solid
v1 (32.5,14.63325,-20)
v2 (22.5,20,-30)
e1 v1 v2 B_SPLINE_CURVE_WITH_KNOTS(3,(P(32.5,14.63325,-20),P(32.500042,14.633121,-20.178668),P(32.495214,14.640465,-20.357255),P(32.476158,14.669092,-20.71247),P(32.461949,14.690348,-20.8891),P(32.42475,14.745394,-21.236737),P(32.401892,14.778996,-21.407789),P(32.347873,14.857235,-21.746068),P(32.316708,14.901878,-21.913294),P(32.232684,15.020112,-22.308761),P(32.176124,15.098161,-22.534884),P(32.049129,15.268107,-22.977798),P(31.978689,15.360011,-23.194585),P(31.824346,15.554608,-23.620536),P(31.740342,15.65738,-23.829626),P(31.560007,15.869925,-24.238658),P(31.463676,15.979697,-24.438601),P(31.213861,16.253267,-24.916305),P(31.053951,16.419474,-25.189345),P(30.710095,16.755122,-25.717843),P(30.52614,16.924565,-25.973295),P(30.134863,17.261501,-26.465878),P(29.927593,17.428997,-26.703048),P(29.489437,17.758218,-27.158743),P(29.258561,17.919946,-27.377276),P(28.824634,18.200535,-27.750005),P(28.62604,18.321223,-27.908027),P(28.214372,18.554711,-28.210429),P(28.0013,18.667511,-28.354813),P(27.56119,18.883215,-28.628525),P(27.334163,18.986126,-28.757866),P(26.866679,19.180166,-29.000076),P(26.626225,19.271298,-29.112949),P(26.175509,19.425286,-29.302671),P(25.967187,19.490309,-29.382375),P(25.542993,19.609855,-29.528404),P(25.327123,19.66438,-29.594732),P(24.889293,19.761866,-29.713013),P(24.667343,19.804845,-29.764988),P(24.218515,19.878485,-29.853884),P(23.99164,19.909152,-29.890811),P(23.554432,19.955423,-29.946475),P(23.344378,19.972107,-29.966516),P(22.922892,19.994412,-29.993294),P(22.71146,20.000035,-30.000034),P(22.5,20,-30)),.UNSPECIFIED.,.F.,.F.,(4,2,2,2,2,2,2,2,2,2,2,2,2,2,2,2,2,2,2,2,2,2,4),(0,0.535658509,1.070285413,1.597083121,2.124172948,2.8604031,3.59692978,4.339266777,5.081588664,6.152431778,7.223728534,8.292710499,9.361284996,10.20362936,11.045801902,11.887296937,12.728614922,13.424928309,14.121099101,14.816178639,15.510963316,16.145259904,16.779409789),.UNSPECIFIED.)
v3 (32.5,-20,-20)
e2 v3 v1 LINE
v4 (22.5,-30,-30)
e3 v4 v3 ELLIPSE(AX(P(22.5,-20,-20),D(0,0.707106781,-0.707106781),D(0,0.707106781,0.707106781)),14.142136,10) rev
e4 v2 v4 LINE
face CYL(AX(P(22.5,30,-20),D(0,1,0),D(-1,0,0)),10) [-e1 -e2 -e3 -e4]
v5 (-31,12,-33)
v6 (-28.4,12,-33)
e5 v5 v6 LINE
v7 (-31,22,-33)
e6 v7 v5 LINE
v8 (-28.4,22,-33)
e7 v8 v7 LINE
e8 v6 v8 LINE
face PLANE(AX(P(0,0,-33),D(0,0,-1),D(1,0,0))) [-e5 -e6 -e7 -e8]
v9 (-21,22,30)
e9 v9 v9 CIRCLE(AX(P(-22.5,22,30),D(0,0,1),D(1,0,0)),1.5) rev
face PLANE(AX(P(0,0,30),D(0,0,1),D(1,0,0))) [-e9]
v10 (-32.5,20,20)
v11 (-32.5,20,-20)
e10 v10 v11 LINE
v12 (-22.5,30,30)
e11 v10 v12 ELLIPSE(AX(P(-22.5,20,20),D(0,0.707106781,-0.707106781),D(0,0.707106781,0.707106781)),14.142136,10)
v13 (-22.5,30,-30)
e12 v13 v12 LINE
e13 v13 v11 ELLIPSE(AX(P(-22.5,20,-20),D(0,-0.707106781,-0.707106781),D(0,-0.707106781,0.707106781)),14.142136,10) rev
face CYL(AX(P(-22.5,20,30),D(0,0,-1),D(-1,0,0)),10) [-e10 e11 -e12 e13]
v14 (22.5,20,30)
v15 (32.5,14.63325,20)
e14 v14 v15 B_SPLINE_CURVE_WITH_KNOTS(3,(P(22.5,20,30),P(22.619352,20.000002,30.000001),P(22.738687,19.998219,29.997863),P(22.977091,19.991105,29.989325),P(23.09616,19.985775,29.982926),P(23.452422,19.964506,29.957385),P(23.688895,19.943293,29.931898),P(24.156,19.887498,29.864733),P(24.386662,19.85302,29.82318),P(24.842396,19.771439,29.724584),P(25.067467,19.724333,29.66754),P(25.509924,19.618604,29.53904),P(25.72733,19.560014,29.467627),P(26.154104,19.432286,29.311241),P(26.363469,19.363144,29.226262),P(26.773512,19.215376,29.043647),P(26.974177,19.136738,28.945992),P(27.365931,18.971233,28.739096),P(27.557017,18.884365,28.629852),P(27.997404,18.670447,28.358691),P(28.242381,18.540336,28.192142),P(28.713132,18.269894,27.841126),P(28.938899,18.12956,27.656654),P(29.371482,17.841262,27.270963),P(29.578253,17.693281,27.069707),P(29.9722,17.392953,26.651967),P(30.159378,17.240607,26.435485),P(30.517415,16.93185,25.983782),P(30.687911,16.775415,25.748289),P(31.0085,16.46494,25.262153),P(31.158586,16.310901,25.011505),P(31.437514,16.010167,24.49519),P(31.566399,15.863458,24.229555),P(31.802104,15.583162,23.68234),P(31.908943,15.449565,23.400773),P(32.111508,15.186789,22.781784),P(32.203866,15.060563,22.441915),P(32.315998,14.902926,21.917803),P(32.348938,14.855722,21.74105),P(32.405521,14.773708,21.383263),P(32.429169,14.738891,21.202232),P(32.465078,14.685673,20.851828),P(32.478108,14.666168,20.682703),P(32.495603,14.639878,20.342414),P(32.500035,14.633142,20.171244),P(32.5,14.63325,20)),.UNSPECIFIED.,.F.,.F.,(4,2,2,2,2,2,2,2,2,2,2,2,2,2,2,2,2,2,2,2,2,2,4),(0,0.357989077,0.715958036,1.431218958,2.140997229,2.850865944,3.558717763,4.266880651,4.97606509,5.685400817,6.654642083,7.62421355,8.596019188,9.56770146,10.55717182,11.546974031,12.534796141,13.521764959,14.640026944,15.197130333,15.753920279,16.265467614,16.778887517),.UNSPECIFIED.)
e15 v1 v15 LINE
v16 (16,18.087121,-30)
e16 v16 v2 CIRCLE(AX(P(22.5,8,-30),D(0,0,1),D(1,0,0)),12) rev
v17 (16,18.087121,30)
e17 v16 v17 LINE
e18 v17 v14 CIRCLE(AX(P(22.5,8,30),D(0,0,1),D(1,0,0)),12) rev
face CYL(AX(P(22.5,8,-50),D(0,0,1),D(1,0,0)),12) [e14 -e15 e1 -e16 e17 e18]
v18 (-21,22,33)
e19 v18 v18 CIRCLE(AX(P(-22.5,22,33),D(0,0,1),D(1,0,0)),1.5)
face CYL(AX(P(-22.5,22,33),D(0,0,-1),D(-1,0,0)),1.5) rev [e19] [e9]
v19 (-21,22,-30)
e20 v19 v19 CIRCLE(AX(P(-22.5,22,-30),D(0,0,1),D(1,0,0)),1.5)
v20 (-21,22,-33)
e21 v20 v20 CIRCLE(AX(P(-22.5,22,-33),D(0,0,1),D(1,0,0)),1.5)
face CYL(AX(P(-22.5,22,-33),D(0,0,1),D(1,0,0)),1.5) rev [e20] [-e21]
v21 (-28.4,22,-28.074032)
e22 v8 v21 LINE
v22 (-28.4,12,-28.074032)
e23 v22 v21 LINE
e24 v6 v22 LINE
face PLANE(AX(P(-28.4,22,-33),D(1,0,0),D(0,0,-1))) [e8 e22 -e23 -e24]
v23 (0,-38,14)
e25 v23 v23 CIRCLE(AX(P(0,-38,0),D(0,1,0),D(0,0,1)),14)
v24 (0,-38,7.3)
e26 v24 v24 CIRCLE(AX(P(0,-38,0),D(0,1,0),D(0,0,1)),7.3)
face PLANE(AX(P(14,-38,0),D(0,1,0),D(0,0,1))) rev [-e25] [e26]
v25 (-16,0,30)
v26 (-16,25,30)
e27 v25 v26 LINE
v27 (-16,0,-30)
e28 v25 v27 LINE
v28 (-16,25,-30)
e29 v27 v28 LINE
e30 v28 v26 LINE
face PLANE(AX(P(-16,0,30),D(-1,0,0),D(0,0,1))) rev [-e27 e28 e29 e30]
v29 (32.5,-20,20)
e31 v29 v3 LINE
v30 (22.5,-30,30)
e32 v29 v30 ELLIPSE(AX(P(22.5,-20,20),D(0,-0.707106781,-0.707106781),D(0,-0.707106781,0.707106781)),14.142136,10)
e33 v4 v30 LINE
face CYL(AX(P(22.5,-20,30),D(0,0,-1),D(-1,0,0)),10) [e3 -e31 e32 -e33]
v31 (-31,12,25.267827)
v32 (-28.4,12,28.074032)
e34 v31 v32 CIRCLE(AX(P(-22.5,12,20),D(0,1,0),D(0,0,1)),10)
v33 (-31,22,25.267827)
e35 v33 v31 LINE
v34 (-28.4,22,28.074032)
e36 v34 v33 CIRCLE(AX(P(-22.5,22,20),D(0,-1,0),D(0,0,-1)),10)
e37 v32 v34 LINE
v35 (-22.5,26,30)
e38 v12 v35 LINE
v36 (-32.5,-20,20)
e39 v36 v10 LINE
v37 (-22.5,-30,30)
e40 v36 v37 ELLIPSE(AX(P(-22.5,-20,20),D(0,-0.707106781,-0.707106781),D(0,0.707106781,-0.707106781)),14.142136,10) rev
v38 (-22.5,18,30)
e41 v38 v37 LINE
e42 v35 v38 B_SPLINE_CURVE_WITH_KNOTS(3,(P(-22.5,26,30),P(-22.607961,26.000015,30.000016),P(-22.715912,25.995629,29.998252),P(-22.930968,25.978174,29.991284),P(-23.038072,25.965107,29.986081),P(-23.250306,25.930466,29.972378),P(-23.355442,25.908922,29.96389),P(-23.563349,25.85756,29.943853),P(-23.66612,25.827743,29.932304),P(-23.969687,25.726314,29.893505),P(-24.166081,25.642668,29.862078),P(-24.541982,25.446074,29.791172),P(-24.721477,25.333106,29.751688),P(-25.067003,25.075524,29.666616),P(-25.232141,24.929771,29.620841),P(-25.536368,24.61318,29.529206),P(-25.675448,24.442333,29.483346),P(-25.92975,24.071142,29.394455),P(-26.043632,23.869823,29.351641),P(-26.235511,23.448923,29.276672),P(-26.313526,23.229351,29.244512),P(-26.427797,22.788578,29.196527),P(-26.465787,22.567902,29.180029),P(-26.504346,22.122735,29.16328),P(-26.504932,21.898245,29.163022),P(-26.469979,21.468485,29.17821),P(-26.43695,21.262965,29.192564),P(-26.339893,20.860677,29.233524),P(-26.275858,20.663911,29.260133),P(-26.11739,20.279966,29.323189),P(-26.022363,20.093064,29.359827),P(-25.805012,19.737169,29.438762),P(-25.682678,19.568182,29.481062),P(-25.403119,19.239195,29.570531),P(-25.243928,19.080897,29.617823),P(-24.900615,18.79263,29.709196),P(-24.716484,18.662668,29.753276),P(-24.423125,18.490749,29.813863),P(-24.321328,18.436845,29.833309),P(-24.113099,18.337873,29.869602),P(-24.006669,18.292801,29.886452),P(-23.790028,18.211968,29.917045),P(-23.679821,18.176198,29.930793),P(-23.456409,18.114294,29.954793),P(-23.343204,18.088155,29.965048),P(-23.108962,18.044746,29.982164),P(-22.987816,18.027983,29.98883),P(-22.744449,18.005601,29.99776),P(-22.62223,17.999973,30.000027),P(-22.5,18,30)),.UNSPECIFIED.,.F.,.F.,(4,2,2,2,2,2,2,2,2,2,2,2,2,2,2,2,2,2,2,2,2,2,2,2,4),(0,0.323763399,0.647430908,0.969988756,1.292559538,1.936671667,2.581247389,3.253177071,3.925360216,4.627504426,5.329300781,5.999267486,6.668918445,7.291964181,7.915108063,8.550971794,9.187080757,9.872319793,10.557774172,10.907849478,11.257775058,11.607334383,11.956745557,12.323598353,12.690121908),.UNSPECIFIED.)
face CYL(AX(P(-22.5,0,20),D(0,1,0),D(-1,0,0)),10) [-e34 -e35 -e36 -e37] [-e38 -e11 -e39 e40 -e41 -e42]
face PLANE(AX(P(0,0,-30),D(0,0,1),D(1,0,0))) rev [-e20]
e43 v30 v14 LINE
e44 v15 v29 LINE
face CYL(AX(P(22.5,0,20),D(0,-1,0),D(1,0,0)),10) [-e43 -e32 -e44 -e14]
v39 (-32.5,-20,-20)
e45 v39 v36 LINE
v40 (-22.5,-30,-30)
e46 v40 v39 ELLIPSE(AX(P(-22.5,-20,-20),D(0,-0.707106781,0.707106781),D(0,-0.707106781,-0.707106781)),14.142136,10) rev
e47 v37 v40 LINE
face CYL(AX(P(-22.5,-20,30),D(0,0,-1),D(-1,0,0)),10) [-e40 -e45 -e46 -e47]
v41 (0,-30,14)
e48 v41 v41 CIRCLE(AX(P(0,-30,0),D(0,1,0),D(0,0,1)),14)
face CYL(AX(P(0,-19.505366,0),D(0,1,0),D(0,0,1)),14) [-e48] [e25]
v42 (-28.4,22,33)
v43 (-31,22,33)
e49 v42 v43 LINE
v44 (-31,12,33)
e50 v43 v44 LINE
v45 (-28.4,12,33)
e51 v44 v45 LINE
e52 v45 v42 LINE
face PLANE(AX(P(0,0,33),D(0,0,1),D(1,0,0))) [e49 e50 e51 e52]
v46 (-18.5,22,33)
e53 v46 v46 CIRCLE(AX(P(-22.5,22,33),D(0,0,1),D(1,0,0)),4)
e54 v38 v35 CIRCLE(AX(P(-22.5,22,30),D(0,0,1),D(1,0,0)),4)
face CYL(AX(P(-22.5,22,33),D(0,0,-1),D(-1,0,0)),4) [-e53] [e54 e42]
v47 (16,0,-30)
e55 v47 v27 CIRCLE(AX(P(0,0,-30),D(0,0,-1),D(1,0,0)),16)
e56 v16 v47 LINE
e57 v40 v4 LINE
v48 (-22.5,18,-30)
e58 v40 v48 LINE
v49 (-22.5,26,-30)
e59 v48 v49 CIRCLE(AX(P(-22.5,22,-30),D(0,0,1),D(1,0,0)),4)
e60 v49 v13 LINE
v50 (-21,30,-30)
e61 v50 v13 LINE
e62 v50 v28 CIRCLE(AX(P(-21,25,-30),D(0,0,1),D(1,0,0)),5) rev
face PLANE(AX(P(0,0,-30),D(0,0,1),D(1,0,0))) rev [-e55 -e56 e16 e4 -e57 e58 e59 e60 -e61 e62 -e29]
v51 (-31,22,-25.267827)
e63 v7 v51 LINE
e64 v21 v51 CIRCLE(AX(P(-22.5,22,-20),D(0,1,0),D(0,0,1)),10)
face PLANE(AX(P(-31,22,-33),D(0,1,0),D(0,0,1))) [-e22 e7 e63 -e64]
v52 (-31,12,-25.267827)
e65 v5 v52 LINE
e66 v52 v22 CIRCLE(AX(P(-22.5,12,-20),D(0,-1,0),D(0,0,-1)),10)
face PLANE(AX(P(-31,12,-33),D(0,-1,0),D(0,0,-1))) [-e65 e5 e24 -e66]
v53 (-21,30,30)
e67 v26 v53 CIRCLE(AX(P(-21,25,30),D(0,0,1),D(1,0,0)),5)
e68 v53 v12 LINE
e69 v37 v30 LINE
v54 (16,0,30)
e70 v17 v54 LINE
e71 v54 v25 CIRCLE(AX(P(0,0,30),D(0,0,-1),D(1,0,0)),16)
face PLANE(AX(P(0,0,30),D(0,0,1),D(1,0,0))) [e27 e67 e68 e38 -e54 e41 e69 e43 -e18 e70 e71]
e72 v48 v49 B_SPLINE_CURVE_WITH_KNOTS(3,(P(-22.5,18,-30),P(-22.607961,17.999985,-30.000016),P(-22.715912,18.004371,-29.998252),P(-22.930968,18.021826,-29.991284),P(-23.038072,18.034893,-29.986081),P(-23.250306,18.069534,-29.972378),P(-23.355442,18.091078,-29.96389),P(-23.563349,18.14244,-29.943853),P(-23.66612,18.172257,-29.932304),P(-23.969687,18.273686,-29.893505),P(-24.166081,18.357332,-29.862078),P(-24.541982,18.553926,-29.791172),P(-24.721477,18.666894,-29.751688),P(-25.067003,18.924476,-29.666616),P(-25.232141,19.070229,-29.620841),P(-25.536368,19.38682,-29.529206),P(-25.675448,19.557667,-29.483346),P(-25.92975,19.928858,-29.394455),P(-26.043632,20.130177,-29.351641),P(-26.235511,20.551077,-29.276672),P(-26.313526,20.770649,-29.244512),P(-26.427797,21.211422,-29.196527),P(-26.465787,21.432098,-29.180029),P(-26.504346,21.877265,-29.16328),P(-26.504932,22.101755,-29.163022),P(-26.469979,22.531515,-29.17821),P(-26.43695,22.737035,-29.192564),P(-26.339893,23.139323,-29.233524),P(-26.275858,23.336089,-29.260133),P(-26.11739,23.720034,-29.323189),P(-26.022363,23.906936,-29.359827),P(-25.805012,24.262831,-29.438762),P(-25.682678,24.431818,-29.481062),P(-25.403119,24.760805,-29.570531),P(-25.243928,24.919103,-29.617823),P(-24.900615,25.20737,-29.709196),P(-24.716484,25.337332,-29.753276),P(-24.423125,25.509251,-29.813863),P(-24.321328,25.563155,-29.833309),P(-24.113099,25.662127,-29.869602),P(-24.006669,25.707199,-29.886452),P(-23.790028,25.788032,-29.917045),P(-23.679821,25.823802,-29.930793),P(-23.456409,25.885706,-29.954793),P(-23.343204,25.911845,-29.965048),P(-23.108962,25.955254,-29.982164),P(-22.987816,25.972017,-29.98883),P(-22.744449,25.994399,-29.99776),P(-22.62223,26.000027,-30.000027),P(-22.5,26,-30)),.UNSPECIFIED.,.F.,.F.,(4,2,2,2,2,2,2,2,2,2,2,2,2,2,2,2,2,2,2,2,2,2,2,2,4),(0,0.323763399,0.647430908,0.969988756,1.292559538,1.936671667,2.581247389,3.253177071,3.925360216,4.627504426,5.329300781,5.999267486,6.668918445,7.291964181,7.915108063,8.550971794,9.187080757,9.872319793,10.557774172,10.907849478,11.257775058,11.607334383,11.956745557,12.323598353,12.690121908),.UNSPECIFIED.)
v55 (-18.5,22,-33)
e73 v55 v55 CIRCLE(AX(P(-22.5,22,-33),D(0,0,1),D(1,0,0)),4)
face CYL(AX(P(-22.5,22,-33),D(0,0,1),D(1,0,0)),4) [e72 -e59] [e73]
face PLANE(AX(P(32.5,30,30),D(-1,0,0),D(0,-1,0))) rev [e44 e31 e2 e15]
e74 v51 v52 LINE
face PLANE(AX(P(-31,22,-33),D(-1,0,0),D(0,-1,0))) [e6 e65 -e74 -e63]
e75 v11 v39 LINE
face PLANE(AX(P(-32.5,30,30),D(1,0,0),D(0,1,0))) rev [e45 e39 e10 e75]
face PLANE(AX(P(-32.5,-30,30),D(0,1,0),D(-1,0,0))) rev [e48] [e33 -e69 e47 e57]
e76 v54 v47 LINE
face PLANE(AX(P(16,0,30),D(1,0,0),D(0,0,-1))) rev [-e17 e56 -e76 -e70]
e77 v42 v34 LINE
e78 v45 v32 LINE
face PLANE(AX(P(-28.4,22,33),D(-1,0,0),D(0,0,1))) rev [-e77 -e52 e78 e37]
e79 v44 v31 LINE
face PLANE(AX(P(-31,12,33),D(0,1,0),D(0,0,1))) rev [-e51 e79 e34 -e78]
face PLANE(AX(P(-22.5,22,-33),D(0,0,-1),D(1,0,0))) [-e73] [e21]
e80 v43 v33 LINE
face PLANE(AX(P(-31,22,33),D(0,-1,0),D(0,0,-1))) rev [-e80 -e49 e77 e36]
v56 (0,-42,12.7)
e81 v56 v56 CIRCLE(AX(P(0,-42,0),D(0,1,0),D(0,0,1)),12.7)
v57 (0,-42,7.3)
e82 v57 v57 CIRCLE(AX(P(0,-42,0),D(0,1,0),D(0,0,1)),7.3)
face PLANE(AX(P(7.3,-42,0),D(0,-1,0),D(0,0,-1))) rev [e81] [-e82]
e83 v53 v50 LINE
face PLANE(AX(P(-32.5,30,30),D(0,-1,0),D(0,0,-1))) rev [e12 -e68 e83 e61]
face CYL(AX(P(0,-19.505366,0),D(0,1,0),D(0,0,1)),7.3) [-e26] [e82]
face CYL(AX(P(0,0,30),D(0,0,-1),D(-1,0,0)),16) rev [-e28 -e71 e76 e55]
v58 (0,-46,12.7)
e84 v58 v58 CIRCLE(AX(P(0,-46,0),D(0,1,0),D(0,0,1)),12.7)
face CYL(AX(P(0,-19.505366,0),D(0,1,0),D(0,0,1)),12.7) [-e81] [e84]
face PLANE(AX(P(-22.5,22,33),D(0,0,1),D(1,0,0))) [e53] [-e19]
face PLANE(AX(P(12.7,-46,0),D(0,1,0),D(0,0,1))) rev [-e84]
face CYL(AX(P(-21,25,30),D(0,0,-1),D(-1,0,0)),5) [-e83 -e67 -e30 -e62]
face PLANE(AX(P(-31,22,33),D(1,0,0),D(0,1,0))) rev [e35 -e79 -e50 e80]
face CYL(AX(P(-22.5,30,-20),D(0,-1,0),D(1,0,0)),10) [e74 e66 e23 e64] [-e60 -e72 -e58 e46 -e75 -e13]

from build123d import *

# Parameters (mm, degrees)
SALIENTE_EXTRUIR1_DEPTH = 30
CROQUIS2_R              = 4
CROQUIS2_R_2            = 1.5
CROQUIS2_W              = 2.6
CROQUIS2_H              = 10
SALIENTE_EXTRUIR2_DEPTH = 3
REDONDEO1_R             = 10
REDONDEO2_R             = 5
CORTAR_EXTRUIR1_DEPTH   = 50


with BuildPart() as part:
    # Croquis1 → Saliente-Extruir1 (new, symmetric)
    with BuildSketch(Plane.XY):
        with BuildLine():
            Line((-32.5, 30), (-16, 30))
            Line((-16, 30), (-16, 0))
            ThreePointArc((-16, 0), (0, -16), (16, 0))
            Line((16, 0), (16, 30))
            Line((16, 30), (32.5, 30))
            Line((32.5, 30), (32.5, -30))
            Line((32.5, -30), (-32.5, -30))
            Line((-32.5, -30), (-32.5, 30))
        make_face()
    extrude(amount=SALIENTE_EXTRUIR1_DEPTH, both=True)

    # Croquis2 → Saliente-Extruir2 (add)
    # profile 1 of 2: a face of its own
    with BuildSketch(Plane.XY.offset(30)):
        with Locations((-22.5, 22)):
            Circle(CROQUIS2_R)
        with Locations((-22.5, 22)):
            Circle(CROQUIS2_R_2, mode=Mode.SUBTRACT)
    # profile 2 of 2: a face of its own
    with BuildSketch(Plane.XY.offset(30)):
        with Locations((-29.7, 17)):
            Rectangle(CROQUIS2_W, CROQUIS2_H)
    saliente_extruir2 = extrude(amount=SALIENTE_EXTRUIR2_DEPTH)

    # Croquis4 → Revolución1 (revolve)
    with BuildSketch(Plane.XY, mode=Mode.PRIVATE) as revoluci_n1_sk:
        Polygon((0, -30), (14, -30), (14, -38), (7.3, -38), (7.3, -42), (12.7, -42), (12.7, -46), (0, -46), align=None)
    revolve(revoluci_n1_sk.sketch.rotate(Axis((0, -19.505365955, 0), (0, -1, 0)), 90), axis=Axis((0, -19.505365955, 0), (0, -1, 0)))

    # Simetría2: Saliente-Extruir2 across plane
    add(saliente_extruir2.mirror(Plane.XY))

    # Redondeo1
    # the kernel refuses this fillet: 10 mm, written as the material it takes off along each edge
    with BuildSketch(Plane(origin=(32.5, 55, -30), x_dir=(-1, 0, 0), z_dir=(0, -1, 0)), Plane(origin=(-32.5, 30, -55), x_dir=(1, 0, 0), z_dir=(0, 0, 1)), Plane(origin=(32.5, -30, -55), x_dir=(-1, 0, 0), z_dir=(0, 0, 1)), Plane(origin=(-32.5, -30, -55), x_dir=(0, 1, 0), z_dir=(0, 0, 1))) as redondeo1_piece_1:
        with BuildLine():
            CenterArc((REDONDEO1_R, -REDONDEO1_R), REDONDEO1_R, 90, 90)
            Line((0, -REDONDEO1_R), (0, 0))
            Line((0, 0), (REDONDEO1_R, 0))
        make_face()
    extrude(amount=110, mode=Mode.SUBTRACT)
    with BuildSketch(Plane(origin=(-32.5, -55, -30), x_dir=(0, 0, 1), z_dir=(0, 1, 0))) as redondeo1_piece_2_section:
        with BuildLine():
            CenterArc((REDONDEO1_R, REDONDEO1_R), REDONDEO1_R, 180, 90)
            Line((0, REDONDEO1_R), (0, 0))
            Line((0, 0), (REDONDEO1_R, 0))
        make_face()
    redondeo1_piece_2 = extrude(amount=110, mode=Mode.PRIVATE)
    redondeo1_piece_2 = split(redondeo1_piece_2, bisect_by=Plane(origin=(-31, -9, -26.666087893), z_dir=(-1, 0, 0)), keep=Keep.TOP, mode=Mode.PRIVATE)
    add(redondeo1_piece_2, mode=Mode.SUBTRACT)
    with BuildSketch(Plane(origin=(-32.5, -55, -30), x_dir=(0, 0, 1), z_dir=(0, 1, 0))) as redondeo1_piece_3_section:
        with BuildLine():
            CenterArc((REDONDEO1_R, REDONDEO1_R), REDONDEO1_R, 180, 90)
            Line((0, REDONDEO1_R), (0, 0))
            Line((0, 0), (REDONDEO1_R, 0))
        make_face()
    redondeo1_piece_3 = extrude(amount=110, mode=Mode.PRIVATE)
    redondeo1_piece_3 = split(redondeo1_piece_3, bisect_by=Plane(origin=(-29.890039843, 12, -28.324282077), z_dir=(0, -1, 0)), keep=Keep.TOP, mode=Mode.PRIVATE)
    add(redondeo1_piece_3, mode=Mode.SUBTRACT)
    with BuildSketch(Plane(origin=(-32.5, -55, -30), x_dir=(0, 0, 1), z_dir=(0, 1, 0))) as redondeo1_piece_4_section:
        with BuildLine():
            CenterArc((REDONDEO1_R, REDONDEO1_R), REDONDEO1_R, 180, 90)
            Line((0, REDONDEO1_R), (0, 0))
            Line((0, 0), (REDONDEO1_R, 0))
        make_face()
    redondeo1_piece_4 = extrude(amount=110, mode=Mode.PRIVATE)
    redondeo1_piece_4 = split(redondeo1_piece_4, bisect_by=Plane(origin=(-28.4, 16.722523597, -29.405754559), z_dir=(1, 0, 0)), keep=Keep.TOP, mode=Mode.PRIVATE)
    redondeo1_piece_4 = redondeo1_piece_4 - Plane(origin=(-22.5, 22, -29.405754559), x_dir=(1, 0, 0), z_dir=(0, 0, 1)) * Cylinder(4, 260, mode=Mode.PRIVATE)
    add(redondeo1_piece_4, mode=Mode.SUBTRACT)
    with BuildSketch(Plane(origin=(-32.5, -55, -30), x_dir=(0, 0, 1), z_dir=(0, 1, 0))) as redondeo1_piece_5_section:
        with BuildLine():
            CenterArc((REDONDEO1_R, REDONDEO1_R), REDONDEO1_R, 180, 90)
            Line((0, REDONDEO1_R), (0, 0))
            Line((0, 0), (REDONDEO1_R, 0))
        make_face()
    redondeo1_piece_5 = extrude(amount=110, mode=Mode.PRIVATE)
    redondeo1_piece_5 = split(redondeo1_piece_5, bisect_by=Plane(origin=(-29.890039843, 22, -28.324282077), z_dir=(0, 1, 0)), keep=Keep.TOP, mode=Mode.PRIVATE)
    redondeo1_piece_5 = split(redondeo1_piece_5, bisect_by=Plane(origin=(-28.4, 26, -28.324282077), z_dir=(-1, 0, 0)), keep=Keep.TOP, mode=Mode.PRIVATE)
    add(redondeo1_piece_5, mode=Mode.SUBTRACT)
    with BuildSketch(Plane(origin=(32.5, 55, 30), x_dir=(-1, 0, 0), z_dir=(0, -1, 0)), Plane(origin=(32.5, 30, 55), x_dir=(0, -1, 0), z_dir=(0, 0, -1))) as redondeo1_piece_6:
        with BuildLine():
            CenterArc((REDONDEO1_R, REDONDEO1_R), REDONDEO1_R, 180, 90)
            Line((0, REDONDEO1_R), (0, 0))
            Line((0, 0), (REDONDEO1_R, 0))
        make_face()
    extrude(amount=110, mode=Mode.SUBTRACT)
    with BuildSketch(Plane(origin=(-32.5, -55, 30), x_dir=(0, 0, -1), z_dir=(0, 1, 0))) as redondeo1_piece_7_section:
        with BuildLine():
            CenterArc((REDONDEO1_R, -REDONDEO1_R), REDONDEO1_R, 90, 90)
            Line((0, -REDONDEO1_R), (0, 0))
            Line((0, 0), (REDONDEO1_R, 0))
        make_face()
    redondeo1_piece_7 = extrude(amount=110, mode=Mode.PRIVATE)
    redondeo1_piece_7 = split(redondeo1_piece_7, bisect_by=Plane(origin=(-31, -9, 26.666087893), z_dir=(-1, 0, 0)), keep=Keep.TOP, mode=Mode.PRIVATE)
    add(redondeo1_piece_7, mode=Mode.SUBTRACT)
    with BuildSketch(Plane(origin=(-32.5, -55, 30), x_dir=(0, 0, -1), z_dir=(0, 1, 0))) as redondeo1_piece_8_section:
        with BuildLine():
            CenterArc((REDONDEO1_R, -REDONDEO1_R), REDONDEO1_R, 90, 90)
            Line((0, -REDONDEO1_R), (0, 0))
            Line((0, 0), (REDONDEO1_R, 0))
        make_face()
    redondeo1_piece_8 = extrude(amount=110, mode=Mode.PRIVATE)
    redondeo1_piece_8 = split(redondeo1_piece_8, bisect_by=Plane(origin=(-29.890039843, 12, 28.324282077), z_dir=(0, -1, 0)), keep=Keep.TOP, mode=Mode.PRIVATE)
    add(redondeo1_piece_8, mode=Mode.SUBTRACT)
    with BuildSketch(Plane(origin=(-32.5, -55, 30), x_dir=(0, 0, -1), z_dir=(0, 1, 0))) as redondeo1_piece_9_section:
        with BuildLine():
            CenterArc((REDONDEO1_R, -REDONDEO1_R), REDONDEO1_R, 90, 90)
            Line((0, -REDONDEO1_R), (0, 0))
            Line((0, 0), (REDONDEO1_R, 0))
        make_face()
    redondeo1_piece_9 = extrude(amount=110, mode=Mode.PRIVATE)
    redondeo1_piece_9 = split(redondeo1_piece_9, bisect_by=Plane(origin=(-28.4, 16.722523597, 29.405754559), z_dir=(1, 0, 0)), keep=Keep.TOP, mode=Mode.PRIVATE)
    redondeo1_piece_9 = redondeo1_piece_9 - Plane(origin=(-22.5, 22, 29.405754559), x_dir=(1, 0, 0), z_dir=(0, 0, -1)) * Cylinder(4, 260, mode=Mode.PRIVATE)
    add(redondeo1_piece_9, mode=Mode.SUBTRACT)
    with BuildSketch(Plane(origin=(-32.5, -55, 30), x_dir=(0, 0, -1), z_dir=(0, 1, 0))) as redondeo1_piece_10_section:
        with BuildLine():
            CenterArc((REDONDEO1_R, -REDONDEO1_R), REDONDEO1_R, 90, 90)
            Line((0, -REDONDEO1_R), (0, 0))
            Line((0, 0), (REDONDEO1_R, 0))
        make_face()
    redondeo1_piece_10 = extrude(amount=110, mode=Mode.PRIVATE)
    redondeo1_piece_10 = split(redondeo1_piece_10, bisect_by=Plane(origin=(-29.890039843, 22, 28.324282077), z_dir=(0, 1, 0)), keep=Keep.TOP, mode=Mode.PRIVATE)
    redondeo1_piece_10 = split(redondeo1_piece_10, bisect_by=Plane(origin=(-28.4, 26, 28.324282077), z_dir=(-1, 0, 0)), keep=Keep.TOP, mode=Mode.PRIVATE)
    add(redondeo1_piece_10, mode=Mode.SUBTRACT)

    # Redondeo2
    redondeo2_edges = [part.edges().sort_by_distance(p)[0] for p in [
        (-16, 30, 0),
        (16, 30, 0),
    ]]
    fillet(redondeo2_edges, radius=REDONDEO2_R)

    # Croquis5 → Cortar-Extruir1 (cut, symmetric)
    with BuildSketch(Plane.XY):
        with BuildLine():
            ThreePointArc((16, 18.087120501), (24.958618735, 19.745432896), (32.5, 14.633249581))
            Line((32.5, 14.633249581), (32.5, 20))
            ThreePointArc((32.5, 20), (29.571067812, 27.071067812), (22.5, 30))
            Line((22.5, 30), (21, 30))
            ThreePointArc((21, 30), (17.464466094, 28.535533906), (16, 25))
            Line((16, 25), (16, 18.087120501))
        make_face()
    extrude(amount=CORTAR_EXTRUIR1_DEPTH, both=True, mode=Mode.SUBTRACT)


solid = part.part
